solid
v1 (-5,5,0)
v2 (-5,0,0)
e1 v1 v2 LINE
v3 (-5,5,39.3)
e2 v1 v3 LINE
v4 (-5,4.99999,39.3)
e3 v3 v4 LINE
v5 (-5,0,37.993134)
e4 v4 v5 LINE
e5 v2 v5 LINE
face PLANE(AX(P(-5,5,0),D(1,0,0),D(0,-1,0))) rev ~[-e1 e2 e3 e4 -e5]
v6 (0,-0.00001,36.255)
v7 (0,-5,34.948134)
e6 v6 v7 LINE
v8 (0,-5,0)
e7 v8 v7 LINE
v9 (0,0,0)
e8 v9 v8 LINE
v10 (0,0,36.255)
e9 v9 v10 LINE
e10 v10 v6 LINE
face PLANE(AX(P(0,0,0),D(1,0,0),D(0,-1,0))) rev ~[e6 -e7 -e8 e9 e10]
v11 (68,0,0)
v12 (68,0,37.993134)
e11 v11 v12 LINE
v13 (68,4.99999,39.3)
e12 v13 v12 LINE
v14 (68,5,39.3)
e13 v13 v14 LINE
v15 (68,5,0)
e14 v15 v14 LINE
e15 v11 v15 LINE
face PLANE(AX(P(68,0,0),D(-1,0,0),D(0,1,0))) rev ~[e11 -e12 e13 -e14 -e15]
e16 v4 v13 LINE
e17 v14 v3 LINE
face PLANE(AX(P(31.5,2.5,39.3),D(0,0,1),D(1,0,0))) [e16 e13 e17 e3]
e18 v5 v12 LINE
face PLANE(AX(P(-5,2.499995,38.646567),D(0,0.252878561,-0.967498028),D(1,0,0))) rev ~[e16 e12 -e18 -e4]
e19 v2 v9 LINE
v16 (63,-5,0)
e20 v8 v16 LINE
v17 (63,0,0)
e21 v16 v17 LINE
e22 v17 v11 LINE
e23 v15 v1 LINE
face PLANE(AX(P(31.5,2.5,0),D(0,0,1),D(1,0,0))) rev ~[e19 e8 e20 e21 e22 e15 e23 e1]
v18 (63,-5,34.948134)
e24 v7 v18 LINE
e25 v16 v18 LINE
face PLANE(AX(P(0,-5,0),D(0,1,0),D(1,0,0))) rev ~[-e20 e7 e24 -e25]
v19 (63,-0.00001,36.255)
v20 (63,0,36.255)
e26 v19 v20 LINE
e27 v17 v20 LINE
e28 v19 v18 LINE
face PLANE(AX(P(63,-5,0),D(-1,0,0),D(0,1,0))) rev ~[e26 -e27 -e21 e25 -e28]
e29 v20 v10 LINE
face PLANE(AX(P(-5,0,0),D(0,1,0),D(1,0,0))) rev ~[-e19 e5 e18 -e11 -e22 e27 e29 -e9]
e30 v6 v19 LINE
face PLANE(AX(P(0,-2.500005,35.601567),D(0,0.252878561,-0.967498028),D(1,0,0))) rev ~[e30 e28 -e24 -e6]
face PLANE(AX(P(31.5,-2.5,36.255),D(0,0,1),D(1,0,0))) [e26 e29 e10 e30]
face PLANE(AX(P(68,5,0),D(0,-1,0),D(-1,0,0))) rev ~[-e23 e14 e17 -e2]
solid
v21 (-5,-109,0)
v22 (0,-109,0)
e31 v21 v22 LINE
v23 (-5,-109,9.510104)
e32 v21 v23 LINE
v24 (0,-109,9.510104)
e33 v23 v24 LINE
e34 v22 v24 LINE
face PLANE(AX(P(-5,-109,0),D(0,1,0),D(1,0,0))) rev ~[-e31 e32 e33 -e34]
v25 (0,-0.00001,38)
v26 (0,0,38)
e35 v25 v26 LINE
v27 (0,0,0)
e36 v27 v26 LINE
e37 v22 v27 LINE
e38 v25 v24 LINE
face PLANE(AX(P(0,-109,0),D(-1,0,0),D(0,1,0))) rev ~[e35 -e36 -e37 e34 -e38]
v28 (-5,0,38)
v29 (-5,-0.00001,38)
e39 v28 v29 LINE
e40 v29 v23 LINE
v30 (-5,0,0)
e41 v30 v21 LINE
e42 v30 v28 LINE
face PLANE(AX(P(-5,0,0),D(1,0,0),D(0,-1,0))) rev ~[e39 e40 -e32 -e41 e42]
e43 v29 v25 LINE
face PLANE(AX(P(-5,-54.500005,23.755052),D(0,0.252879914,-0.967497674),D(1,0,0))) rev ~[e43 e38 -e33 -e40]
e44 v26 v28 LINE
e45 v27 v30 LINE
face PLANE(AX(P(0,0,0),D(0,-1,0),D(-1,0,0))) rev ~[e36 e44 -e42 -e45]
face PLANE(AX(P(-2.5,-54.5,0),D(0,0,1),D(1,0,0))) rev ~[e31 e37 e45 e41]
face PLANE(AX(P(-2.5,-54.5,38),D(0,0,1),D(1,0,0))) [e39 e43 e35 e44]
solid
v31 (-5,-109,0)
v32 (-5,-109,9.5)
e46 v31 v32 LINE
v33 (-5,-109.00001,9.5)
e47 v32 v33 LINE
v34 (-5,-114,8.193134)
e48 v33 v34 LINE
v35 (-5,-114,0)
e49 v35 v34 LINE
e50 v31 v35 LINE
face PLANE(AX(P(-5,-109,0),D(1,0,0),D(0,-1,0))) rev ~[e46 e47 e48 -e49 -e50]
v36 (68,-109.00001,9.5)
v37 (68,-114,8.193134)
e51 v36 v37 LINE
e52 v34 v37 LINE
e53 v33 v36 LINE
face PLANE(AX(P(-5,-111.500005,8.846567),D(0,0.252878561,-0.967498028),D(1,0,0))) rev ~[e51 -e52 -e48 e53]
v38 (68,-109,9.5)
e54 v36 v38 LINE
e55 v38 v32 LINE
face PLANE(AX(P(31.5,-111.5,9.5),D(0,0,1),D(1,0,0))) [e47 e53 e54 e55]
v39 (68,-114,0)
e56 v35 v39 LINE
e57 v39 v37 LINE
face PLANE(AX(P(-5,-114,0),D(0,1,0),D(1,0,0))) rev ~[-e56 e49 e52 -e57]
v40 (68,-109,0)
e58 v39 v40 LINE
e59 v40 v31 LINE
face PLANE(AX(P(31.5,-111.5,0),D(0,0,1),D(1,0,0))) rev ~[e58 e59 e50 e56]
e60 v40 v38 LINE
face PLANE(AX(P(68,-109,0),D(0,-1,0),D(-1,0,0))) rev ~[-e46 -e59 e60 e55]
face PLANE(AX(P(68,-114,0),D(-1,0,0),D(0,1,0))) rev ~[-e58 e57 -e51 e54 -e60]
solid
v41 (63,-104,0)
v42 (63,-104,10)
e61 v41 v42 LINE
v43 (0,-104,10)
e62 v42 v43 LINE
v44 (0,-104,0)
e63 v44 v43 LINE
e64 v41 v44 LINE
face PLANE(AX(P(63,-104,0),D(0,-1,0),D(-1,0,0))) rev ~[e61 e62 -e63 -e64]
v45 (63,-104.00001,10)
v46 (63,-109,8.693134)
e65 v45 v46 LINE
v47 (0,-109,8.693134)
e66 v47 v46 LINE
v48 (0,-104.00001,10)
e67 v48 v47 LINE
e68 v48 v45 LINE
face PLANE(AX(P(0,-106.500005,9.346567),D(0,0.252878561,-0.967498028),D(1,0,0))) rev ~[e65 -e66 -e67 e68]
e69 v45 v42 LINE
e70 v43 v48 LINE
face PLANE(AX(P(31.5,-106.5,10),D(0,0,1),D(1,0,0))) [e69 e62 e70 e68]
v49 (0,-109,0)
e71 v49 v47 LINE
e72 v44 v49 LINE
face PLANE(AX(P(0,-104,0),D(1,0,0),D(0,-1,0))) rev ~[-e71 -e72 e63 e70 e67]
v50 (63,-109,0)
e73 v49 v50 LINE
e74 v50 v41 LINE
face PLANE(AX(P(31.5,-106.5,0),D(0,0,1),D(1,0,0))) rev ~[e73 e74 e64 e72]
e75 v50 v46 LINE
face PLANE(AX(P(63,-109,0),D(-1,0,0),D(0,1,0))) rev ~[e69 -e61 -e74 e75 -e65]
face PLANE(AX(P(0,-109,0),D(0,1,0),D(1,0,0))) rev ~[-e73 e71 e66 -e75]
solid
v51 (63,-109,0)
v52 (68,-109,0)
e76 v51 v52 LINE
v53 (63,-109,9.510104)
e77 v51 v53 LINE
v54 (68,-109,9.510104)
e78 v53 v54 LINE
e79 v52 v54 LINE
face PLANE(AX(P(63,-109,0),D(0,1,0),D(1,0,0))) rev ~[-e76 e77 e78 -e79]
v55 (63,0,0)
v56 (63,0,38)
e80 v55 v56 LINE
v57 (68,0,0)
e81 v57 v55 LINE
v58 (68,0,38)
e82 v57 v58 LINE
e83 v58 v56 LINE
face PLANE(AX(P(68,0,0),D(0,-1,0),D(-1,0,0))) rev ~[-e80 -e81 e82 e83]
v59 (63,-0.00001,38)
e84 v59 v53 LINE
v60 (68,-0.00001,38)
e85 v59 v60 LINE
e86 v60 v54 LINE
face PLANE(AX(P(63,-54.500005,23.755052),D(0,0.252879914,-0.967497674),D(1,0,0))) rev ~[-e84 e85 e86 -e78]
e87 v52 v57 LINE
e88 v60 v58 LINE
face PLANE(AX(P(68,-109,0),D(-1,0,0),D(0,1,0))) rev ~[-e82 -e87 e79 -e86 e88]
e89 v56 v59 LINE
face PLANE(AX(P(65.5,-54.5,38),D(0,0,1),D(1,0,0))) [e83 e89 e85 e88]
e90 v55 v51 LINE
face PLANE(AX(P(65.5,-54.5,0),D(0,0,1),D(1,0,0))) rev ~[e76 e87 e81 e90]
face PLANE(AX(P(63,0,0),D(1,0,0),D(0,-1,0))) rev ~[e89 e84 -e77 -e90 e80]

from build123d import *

# Parameters (mm, degrees)
F1_DEPTH   = 36.255
F2_DEPTH   = 39.3
F3_DEPTH   = 9.5
F4_DEPTH   = 10
F5_DEPTH   = 38
F6_SIZE2   = 28.489896
F6_SIZE    = 108.99999
F7_SIZE2   = 1.306866
F7_SIZE    = 4.99999
F7_2_SIZE2 = 1.306866
F7_2_SIZE  = 4.99999
F8_SIZE2   = 1.306866
F8_SIZE    = 4.99999
F8_2_SIZE2 = 1.306866
F8_2_SIZE  = 4.99999
F9_SIZE2   = 28.489896
F9_SIZE    = 108.99999


# Not quite as in the source:
# - a fillet or chamfer is up to 0.001 mm smaller than in the source, because OpenCascade refuses the exact size


with BuildPart() as f1:
    # F0 (on Top) → F1 (new body)
    with BuildSketch(Plane.XY):
        Polygon((63, -5), (63, 0), (0, 0), (0, -5), (5, -5), (58, -5), align=None)
    extrude(amount=F1_DEPTH)

    # F0 (on Top) → F2 (join)
    with BuildSketch(Plane.XY):
        Polygon((0, 0), (63, 0), (68, 0), (68, 5), (-5, 5), (-5, 0), align=None)
    extrude(amount=F2_DEPTH)

    # F7#2 (size 5 and 1.3068764239 in the source; OpenCascade refuses exactly that, so slightly less here)
    f7_2_edges = [f1.edges().sort_by_distance(p)[0] for p in [
        (31.5, 0, 39.3),
    ]]
    f7_2_side = f1.faces().sort_by_distance((31.5, 2.5, 39.3))[0]
    chamfer(f7_2_edges, length=F7_2_SIZE, length2=F7_2_SIZE2, reference=f7_2_side)

    # F8 (size 5 and 1.3068764239 in the source; OpenCascade refuses exactly that, so slightly less here)
    f8_edges = [f1.edges().sort_by_distance(p)[0] for p in [
        (31.5, -5, 36.255),
    ]]
    f8_side = f1.faces().sort_by_distance((31.5, -2.5, 36.255))[0]
    chamfer(f8_edges, length=F8_SIZE, length2=F8_SIZE2, reference=f8_side)


with BuildPart() as f3:
    # F0 (on Top) → F3 (new body)
    with BuildSketch(Plane.XY):
        Polygon((68, -114), (68, -109), (63, -109), (0, -109), (-5, -109), (-5, -114), align=None)
    extrude(amount=F3_DEPTH)

    # F7 (size 5 and 1.3068764239 in the source; OpenCascade refuses exactly that, so slightly less here)
    f7_edges = [f3.edges().sort_by_distance(p)[0] for p in [
        (31.5, -114, 9.5),
    ]]
    f7_side = f3.faces().sort_by_distance((31.5, -111.5, 9.5))[0]
    chamfer(f7_edges, length=F7_SIZE, length2=F7_SIZE2, reference=f7_side)


with BuildPart() as f4:
    # F0 (on Top) → F4 (new body)
    with BuildSketch(Plane.XY):
        Polygon((63, -109), (63, -104), (58, -104), (5, -104), (0, -104), (0, -109), align=None)
    extrude(amount=F4_DEPTH)

    # F8#2 (size 5 and 1.3068764239 in the source; OpenCascade refuses exactly that, so slightly less here)
    f8_2_edges = [f4.edges().sort_by_distance(p)[0] for p in [
        (31.5, -109, 10),
    ]]
    f8_2_side = f4.faces().sort_by_distance((31.5, -106.5, 10))[0]
    chamfer(f8_2_edges, length=F8_2_SIZE, length2=F8_2_SIZE2, reference=f8_2_side)


with BuildPart() as f5:
    # F0 (on Top) → F5 (new body)
    with BuildSketch(Plane.XY):
        Polygon((68, 0), (63, 0), (63, -5), (63, -104), (63, -109), (68, -109), align=None)
    extrude(amount=F5_DEPTH)

    # F6 (size 109 and 28.4899060414 in the source; OpenCascade refuses exactly that, so slightly less here)
    f6_edges = [f5.edges().sort_by_distance(p)[0] for p in [
        (65.5, -109, 38),
    ]]
    f6_side = f5.faces().sort_by_distance((65.5, -54.5, 38))[0]
    chamfer(f6_edges, length=F6_SIZE, length2=F6_SIZE2, reference=f6_side)


with BuildPart() as f5b:
    # F0 (on Top) → F5, piece 2 (new body)
    with BuildSketch(Plane.XY):
        Polygon((0, -5), (0, 0), (-5, 0), (-5, -109), (0, -109), (0, -104), align=None)
    extrude(amount=F5_DEPTH)

    # F9 (size 109 and 28.4899060414 in the source; OpenCascade refuses exactly that, so slightly less here)
    f9_edges = [f5b.edges().sort_by_distance(p)[0] for p in [
        (-2.5, -109, 38),
    ]]
    f9_side = f5b.faces().sort_by_distance((-2.5, -54.5, 38))[0]
    chamfer(f9_edges, length=F9_SIZE, length2=F9_SIZE2, reference=f9_side)


solid = Compound([f1.part, f3.part, f4.part, f5.part, f5b.part])
